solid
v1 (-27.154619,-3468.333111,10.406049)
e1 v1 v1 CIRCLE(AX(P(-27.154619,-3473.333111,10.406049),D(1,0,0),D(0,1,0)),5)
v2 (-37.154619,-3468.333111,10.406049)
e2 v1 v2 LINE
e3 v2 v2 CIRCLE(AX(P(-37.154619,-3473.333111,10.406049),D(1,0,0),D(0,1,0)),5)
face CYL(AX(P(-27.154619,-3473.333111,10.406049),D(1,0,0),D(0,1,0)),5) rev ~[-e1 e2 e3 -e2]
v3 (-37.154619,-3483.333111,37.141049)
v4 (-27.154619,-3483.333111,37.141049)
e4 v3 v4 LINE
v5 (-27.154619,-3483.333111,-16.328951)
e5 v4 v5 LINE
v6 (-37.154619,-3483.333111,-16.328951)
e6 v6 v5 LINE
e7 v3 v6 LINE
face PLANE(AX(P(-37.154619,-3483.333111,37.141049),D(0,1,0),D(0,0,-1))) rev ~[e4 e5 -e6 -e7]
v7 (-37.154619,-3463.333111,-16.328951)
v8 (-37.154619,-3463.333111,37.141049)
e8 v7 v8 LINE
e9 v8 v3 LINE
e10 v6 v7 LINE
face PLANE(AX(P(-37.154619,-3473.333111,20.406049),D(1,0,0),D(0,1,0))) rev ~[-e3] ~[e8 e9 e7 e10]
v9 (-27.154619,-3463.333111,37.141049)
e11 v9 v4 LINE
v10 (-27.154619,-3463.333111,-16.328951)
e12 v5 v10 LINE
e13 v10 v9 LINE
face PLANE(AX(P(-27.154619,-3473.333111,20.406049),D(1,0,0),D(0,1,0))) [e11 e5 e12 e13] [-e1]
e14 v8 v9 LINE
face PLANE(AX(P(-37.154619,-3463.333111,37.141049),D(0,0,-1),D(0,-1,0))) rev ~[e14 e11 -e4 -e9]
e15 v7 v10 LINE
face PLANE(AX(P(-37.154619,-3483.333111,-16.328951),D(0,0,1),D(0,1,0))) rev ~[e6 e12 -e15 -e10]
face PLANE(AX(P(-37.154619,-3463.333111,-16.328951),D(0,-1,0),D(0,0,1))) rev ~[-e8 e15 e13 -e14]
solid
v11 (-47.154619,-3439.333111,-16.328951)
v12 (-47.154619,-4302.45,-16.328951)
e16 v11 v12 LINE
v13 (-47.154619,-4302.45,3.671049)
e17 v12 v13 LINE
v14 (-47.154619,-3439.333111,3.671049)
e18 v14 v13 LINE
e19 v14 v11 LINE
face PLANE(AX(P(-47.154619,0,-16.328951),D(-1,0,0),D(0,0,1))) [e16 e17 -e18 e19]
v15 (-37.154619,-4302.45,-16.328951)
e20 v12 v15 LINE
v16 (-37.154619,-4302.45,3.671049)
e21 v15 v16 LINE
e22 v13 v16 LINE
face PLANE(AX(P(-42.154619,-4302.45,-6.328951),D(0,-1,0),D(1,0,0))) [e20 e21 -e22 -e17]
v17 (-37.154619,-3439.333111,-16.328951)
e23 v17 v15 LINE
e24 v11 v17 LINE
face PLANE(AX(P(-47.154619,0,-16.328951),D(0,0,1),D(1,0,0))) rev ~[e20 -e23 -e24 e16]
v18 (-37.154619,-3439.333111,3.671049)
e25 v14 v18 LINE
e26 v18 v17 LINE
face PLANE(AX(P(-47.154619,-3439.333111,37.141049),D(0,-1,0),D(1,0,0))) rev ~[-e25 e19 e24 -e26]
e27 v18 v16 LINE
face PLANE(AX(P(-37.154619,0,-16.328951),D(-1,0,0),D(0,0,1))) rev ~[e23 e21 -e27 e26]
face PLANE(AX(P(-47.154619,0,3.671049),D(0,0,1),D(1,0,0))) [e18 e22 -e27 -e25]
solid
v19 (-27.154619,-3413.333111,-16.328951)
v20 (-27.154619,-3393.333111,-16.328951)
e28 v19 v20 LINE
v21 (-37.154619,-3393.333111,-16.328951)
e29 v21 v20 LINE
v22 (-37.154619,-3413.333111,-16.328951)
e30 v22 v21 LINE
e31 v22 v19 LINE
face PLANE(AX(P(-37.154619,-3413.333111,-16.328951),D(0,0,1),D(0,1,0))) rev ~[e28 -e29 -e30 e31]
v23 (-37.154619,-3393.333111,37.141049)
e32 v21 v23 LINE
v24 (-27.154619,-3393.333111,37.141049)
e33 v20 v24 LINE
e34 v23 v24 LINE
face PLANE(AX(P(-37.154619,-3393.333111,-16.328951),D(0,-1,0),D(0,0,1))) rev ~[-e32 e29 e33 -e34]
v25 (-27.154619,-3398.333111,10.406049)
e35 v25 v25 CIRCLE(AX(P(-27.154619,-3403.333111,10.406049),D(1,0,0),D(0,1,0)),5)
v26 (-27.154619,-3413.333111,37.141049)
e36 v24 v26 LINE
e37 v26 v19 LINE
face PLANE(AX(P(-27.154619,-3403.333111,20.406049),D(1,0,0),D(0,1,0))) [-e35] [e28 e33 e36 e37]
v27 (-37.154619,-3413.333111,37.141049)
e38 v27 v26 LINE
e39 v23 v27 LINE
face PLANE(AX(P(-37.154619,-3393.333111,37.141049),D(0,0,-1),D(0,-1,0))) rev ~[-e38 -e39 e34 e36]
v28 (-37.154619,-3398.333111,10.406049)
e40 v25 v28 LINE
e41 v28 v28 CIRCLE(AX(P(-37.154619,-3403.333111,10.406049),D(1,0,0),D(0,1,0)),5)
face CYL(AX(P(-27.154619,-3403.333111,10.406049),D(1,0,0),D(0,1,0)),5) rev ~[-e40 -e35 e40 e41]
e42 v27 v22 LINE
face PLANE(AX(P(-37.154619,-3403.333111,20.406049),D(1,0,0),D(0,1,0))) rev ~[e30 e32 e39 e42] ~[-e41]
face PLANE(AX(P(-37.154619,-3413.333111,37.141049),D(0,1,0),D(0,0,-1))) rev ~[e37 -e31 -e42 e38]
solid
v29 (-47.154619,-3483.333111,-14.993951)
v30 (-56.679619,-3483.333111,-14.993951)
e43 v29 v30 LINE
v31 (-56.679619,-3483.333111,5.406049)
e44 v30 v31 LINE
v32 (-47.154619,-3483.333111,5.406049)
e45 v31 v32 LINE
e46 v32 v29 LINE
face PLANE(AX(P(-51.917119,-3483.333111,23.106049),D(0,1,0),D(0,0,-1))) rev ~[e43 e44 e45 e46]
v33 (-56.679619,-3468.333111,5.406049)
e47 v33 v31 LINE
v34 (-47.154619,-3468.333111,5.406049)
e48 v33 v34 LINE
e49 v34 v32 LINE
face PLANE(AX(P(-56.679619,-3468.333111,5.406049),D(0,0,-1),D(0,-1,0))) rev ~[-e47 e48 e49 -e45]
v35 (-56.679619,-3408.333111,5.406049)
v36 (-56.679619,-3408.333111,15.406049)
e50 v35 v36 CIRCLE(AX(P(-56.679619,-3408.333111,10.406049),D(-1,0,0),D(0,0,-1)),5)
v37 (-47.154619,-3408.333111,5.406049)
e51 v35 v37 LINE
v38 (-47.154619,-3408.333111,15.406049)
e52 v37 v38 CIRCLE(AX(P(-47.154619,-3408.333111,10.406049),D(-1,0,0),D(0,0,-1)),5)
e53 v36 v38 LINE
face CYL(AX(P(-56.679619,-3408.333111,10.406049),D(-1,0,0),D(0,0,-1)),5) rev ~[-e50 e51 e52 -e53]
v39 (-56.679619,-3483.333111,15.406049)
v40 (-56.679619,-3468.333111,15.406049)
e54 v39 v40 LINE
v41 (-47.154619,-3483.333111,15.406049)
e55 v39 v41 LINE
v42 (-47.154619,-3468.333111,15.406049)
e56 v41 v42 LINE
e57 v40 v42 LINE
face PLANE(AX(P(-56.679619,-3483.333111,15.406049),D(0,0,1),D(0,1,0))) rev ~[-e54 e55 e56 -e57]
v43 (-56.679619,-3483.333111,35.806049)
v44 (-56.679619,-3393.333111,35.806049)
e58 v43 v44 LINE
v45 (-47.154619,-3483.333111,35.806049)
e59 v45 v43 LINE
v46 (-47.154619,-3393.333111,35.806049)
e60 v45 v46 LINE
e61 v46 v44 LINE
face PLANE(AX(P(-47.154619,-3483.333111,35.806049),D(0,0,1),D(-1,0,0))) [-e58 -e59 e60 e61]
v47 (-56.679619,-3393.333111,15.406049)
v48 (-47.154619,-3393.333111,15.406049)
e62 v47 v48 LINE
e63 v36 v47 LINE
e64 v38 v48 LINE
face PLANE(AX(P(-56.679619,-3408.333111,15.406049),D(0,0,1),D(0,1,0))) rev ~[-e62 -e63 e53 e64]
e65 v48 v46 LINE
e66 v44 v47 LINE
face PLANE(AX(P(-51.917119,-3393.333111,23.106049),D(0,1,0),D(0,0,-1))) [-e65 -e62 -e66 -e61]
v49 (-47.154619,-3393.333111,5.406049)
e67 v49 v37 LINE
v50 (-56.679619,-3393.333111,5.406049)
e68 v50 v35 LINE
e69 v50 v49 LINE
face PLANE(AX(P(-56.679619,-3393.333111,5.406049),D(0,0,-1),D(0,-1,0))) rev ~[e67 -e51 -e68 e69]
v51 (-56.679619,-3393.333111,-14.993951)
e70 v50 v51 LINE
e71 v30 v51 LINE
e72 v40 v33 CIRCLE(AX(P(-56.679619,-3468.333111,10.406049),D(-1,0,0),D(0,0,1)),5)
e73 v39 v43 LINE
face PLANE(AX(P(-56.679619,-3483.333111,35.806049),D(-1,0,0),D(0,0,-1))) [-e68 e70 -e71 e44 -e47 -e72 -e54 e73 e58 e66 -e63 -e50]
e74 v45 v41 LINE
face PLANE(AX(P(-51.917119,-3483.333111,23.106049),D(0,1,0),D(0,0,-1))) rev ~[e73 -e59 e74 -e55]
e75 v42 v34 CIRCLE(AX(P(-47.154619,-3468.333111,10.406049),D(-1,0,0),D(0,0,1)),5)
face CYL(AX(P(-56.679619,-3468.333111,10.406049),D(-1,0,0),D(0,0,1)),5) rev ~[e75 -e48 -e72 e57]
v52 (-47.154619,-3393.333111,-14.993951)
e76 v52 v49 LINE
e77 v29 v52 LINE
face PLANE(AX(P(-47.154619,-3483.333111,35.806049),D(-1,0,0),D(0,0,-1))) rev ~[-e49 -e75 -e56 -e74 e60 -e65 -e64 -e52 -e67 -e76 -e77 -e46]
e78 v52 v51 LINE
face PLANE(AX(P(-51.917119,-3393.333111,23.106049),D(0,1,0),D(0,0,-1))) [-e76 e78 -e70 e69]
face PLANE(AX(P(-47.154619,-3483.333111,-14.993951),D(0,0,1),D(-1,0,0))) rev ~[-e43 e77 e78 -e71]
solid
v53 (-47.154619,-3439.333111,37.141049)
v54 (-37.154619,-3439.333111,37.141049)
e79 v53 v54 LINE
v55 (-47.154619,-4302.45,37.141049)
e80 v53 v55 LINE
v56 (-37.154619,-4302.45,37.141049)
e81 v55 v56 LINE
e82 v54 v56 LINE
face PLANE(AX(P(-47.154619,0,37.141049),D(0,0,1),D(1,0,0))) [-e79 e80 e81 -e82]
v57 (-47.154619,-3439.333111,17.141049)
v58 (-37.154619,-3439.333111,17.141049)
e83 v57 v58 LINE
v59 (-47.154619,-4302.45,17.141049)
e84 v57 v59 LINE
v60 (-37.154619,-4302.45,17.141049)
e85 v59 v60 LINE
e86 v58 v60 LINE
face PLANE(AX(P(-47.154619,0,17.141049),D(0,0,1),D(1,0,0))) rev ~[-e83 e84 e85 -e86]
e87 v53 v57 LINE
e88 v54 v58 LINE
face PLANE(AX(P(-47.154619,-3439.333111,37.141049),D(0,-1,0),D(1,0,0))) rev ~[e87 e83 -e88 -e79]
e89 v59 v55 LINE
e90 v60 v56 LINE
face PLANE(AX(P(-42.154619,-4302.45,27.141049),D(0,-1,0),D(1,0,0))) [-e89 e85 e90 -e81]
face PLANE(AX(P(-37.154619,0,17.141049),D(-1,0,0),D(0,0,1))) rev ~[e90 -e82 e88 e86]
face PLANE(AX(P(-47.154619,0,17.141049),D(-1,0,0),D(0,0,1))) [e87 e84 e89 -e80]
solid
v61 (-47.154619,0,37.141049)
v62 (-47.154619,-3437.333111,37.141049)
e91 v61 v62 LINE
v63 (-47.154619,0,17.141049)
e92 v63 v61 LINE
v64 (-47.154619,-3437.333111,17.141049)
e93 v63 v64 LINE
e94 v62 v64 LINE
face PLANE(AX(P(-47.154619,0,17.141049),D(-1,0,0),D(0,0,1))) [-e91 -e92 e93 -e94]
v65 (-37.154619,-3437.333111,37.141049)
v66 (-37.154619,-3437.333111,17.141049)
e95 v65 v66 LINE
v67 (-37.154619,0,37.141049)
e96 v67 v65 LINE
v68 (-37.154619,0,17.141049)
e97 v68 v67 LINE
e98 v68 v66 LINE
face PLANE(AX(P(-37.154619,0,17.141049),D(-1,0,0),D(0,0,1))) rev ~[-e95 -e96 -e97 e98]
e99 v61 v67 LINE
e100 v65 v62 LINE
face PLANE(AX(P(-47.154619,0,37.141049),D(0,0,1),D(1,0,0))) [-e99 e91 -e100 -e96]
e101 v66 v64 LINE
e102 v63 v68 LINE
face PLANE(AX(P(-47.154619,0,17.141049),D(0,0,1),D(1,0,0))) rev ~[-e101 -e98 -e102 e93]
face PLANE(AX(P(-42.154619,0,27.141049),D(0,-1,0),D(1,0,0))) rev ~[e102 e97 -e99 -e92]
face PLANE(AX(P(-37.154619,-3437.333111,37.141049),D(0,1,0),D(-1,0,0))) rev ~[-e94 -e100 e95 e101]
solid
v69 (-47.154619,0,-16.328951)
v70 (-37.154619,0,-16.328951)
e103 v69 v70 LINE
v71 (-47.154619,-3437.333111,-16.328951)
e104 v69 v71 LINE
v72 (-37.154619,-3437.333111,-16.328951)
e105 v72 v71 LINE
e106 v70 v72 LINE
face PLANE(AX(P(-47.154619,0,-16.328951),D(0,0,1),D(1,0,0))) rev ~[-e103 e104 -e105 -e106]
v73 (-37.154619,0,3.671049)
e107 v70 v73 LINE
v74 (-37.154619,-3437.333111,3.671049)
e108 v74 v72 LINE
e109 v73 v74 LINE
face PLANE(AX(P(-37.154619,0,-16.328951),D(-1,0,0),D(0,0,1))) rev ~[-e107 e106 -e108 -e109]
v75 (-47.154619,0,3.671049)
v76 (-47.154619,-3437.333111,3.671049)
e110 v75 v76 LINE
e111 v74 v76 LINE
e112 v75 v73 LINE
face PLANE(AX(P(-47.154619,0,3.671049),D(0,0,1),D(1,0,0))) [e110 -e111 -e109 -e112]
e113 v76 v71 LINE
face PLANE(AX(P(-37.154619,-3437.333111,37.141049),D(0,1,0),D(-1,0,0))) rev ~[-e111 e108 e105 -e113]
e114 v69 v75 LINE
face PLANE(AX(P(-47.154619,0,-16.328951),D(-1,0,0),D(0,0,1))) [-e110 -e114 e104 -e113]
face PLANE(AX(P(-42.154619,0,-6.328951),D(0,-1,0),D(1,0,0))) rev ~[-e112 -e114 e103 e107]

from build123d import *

# Parameters (mm, degrees)
F0_W      = 10
F0_H      = 20
F1_DEPTH  = 4302.45
F3_E6_W   = 25.4
F3_E6_H   = 9.525
F3_E5_W   = 25.4
F3_E5_H   = 9.525
F4_DEPTH  = 90
F7_DEPTH  = 10
F9_DEPTH  = 53.47
F10_R     = 5
F11_R     = 5
F12_DEPTH = 10
F14_DEPTH = 9.525


with BuildPart() as f1:
    # F0 (on Front) → F1 (new body)
    with BuildSketch(Plane.XZ):
        with Locations((-42.1546186507, 27.1410486561)):
            Rectangle(F0_W, F0_H)
        with Locations((-42.1546186507, -6.3289513439)):
            Rectangle(F0_W, F0_H)
    extrude(amount=F1_DEPTH)

    # F8 (on face) → F9 (cut, through all)
    with BuildSketch(Plane.XY.offset(37.1410486561)):
        Polygon((-47.1546186507, -3438.3331108093), (-47.1546186507, -3439.3331108093), (-37.1546186507, -3439.3331108093), (-37.1546186507, -3438.3331108093), (-37.1546186507, -3437.3331108093), (-47.1546186507, -3437.3331108093), align=None)
    extrude(amount=-F9_DEPTH, mode=Mode.SUBTRACT)


with BuildPart() as f4:
    # F3_E6 (on explicit) + F3_E5 (on explicit) → F4 (new body)
    with BuildSketch(Plane(origin=(-47.1546186507, -3483.3331108093, 10.4060486561), x_dir=(0, 0, -1), z_dir=(0, 1, 0))):
        with Locations((12.7, 4.7625)):
            Rectangle(F3_E6_W, F3_E6_H)
    with BuildSketch(Plane(origin=(-47.1546186507, -3483.3331108093, 35.8060486561), x_dir=(0, 0, -1), z_dir=(0, 1, 0))):
        with Locations((12.7, 4.7625)):
            Rectangle(F3_E5_W, F3_E5_H)
    extrude(amount=F4_DEPTH)

    # F13 (on face) + F5 (on face) → F14 (cut, through all)
    with BuildSketch(Plane(origin=(-56.6796186507, 0, 0), x_dir=(0, -1, 0), z_dir=(-1, 0, 0))):
        with BuildLine():
            Line((3408.3331108093, 15.4060486561), (3393.3331108093, 15.4060486561))
            Line((3393.3331108093, 15.4060486561), (3393.3331108093, 5.4060486561))
            Line((3393.3331108093, 5.4060486561), (3403.3331108093, 5.4060486561))
            Line((3403.3331108093, 5.4060486561), (3408.3331108093, 5.4060486561))
            ThreePointArc((3408.3331108093, 5.4060486561), (3413.3331108093, 10.4060486561), (3408.3331108093, 15.4060486561))
        make_face()
    with BuildSketch(Plane(origin=(-56.6796186507, 0, 0), x_dir=(0, -1, 0), z_dir=(-1, 0, 0))):
        with BuildLine():
            ThreePointArc((3468.3331108093, 15.4060486561), (3463.3331108093, 10.4060486561), (3468.3331108093, 5.4060486561))
            Line((3468.3331108093, 5.4060486561), (3473.3331108093, 5.4060486561))
            Line((3473.3331108093, 5.4060486561), (3483.3331108093, 5.4060486561))
            Line((3483.3331108093, 5.4060486561), (3483.3331108093, 15.4060486561))
            Line((3483.3331108093, 15.4060486561), (3468.3331108093, 15.4060486561))
        make_face()
    extrude(amount=-F14_DEPTH, mode=Mode.SUBTRACT)


with BuildPart() as f7:
    # F6 (on face) → F7 (new body)
    with BuildSketch(Plane.YZ.offset(-37.1546186507)):
        Polygon((-3483.3331108093, 37.1410486561), (-3483.3331108093, 35.8060486561), (-3483.3331108093, 15.4060486561), (-3483.3331108093, 5.4060486561), (-3483.3331108093, 3.6710486561), (-3463.3331108093, 3.6710486561), (-3463.3331108093, 37.1410486561), align=None)
        Polygon((-3463.3331108093, 3.6710486561), (-3483.3331108093, 3.6710486561), (-3483.3331108093, -14.9939513439), (-3483.3331108093, -16.3289513439), (-3463.3331108093, -16.3289513439), align=None)
        Polygon((-3393.3331108093, 37.1410486561), (-3413.3331108093, 37.1410486561), (-3413.3331108093, 3.6710486561), (-3393.3331108093, 3.6710486561), (-3393.3331108093, 5.4060486561), (-3393.3331108093, 15.4060486561), (-3393.3331108093, 35.8060486561), align=None)
        Polygon((-3393.3331108093, 3.6710486561), (-3413.3331108093, 3.6710486561), (-3413.3331108093, -16.3289513439), (-3393.3331108093, -16.3289513439), (-3393.3331108093, -14.9939513439), align=None)
    extrude(amount=F7_DEPTH)

    # F10 (on face) + F11 (on face) → F12 (cut)
    with BuildSketch(Plane.YZ.offset(-27.1546186507)):
        with Locations((-3473.3331108093, 10.4060486561)):
            Circle(F10_R)
    with BuildSketch(Plane.YZ.offset(-27.1546186507)):
        with Locations((-3403.3331108093, 10.4060486561)):
            Circle(F11_R)
    extrude(amount=-F12_DEPTH, mode=Mode.SUBTRACT)


solid = Compound([f1.part, f4.part, f7.part])
